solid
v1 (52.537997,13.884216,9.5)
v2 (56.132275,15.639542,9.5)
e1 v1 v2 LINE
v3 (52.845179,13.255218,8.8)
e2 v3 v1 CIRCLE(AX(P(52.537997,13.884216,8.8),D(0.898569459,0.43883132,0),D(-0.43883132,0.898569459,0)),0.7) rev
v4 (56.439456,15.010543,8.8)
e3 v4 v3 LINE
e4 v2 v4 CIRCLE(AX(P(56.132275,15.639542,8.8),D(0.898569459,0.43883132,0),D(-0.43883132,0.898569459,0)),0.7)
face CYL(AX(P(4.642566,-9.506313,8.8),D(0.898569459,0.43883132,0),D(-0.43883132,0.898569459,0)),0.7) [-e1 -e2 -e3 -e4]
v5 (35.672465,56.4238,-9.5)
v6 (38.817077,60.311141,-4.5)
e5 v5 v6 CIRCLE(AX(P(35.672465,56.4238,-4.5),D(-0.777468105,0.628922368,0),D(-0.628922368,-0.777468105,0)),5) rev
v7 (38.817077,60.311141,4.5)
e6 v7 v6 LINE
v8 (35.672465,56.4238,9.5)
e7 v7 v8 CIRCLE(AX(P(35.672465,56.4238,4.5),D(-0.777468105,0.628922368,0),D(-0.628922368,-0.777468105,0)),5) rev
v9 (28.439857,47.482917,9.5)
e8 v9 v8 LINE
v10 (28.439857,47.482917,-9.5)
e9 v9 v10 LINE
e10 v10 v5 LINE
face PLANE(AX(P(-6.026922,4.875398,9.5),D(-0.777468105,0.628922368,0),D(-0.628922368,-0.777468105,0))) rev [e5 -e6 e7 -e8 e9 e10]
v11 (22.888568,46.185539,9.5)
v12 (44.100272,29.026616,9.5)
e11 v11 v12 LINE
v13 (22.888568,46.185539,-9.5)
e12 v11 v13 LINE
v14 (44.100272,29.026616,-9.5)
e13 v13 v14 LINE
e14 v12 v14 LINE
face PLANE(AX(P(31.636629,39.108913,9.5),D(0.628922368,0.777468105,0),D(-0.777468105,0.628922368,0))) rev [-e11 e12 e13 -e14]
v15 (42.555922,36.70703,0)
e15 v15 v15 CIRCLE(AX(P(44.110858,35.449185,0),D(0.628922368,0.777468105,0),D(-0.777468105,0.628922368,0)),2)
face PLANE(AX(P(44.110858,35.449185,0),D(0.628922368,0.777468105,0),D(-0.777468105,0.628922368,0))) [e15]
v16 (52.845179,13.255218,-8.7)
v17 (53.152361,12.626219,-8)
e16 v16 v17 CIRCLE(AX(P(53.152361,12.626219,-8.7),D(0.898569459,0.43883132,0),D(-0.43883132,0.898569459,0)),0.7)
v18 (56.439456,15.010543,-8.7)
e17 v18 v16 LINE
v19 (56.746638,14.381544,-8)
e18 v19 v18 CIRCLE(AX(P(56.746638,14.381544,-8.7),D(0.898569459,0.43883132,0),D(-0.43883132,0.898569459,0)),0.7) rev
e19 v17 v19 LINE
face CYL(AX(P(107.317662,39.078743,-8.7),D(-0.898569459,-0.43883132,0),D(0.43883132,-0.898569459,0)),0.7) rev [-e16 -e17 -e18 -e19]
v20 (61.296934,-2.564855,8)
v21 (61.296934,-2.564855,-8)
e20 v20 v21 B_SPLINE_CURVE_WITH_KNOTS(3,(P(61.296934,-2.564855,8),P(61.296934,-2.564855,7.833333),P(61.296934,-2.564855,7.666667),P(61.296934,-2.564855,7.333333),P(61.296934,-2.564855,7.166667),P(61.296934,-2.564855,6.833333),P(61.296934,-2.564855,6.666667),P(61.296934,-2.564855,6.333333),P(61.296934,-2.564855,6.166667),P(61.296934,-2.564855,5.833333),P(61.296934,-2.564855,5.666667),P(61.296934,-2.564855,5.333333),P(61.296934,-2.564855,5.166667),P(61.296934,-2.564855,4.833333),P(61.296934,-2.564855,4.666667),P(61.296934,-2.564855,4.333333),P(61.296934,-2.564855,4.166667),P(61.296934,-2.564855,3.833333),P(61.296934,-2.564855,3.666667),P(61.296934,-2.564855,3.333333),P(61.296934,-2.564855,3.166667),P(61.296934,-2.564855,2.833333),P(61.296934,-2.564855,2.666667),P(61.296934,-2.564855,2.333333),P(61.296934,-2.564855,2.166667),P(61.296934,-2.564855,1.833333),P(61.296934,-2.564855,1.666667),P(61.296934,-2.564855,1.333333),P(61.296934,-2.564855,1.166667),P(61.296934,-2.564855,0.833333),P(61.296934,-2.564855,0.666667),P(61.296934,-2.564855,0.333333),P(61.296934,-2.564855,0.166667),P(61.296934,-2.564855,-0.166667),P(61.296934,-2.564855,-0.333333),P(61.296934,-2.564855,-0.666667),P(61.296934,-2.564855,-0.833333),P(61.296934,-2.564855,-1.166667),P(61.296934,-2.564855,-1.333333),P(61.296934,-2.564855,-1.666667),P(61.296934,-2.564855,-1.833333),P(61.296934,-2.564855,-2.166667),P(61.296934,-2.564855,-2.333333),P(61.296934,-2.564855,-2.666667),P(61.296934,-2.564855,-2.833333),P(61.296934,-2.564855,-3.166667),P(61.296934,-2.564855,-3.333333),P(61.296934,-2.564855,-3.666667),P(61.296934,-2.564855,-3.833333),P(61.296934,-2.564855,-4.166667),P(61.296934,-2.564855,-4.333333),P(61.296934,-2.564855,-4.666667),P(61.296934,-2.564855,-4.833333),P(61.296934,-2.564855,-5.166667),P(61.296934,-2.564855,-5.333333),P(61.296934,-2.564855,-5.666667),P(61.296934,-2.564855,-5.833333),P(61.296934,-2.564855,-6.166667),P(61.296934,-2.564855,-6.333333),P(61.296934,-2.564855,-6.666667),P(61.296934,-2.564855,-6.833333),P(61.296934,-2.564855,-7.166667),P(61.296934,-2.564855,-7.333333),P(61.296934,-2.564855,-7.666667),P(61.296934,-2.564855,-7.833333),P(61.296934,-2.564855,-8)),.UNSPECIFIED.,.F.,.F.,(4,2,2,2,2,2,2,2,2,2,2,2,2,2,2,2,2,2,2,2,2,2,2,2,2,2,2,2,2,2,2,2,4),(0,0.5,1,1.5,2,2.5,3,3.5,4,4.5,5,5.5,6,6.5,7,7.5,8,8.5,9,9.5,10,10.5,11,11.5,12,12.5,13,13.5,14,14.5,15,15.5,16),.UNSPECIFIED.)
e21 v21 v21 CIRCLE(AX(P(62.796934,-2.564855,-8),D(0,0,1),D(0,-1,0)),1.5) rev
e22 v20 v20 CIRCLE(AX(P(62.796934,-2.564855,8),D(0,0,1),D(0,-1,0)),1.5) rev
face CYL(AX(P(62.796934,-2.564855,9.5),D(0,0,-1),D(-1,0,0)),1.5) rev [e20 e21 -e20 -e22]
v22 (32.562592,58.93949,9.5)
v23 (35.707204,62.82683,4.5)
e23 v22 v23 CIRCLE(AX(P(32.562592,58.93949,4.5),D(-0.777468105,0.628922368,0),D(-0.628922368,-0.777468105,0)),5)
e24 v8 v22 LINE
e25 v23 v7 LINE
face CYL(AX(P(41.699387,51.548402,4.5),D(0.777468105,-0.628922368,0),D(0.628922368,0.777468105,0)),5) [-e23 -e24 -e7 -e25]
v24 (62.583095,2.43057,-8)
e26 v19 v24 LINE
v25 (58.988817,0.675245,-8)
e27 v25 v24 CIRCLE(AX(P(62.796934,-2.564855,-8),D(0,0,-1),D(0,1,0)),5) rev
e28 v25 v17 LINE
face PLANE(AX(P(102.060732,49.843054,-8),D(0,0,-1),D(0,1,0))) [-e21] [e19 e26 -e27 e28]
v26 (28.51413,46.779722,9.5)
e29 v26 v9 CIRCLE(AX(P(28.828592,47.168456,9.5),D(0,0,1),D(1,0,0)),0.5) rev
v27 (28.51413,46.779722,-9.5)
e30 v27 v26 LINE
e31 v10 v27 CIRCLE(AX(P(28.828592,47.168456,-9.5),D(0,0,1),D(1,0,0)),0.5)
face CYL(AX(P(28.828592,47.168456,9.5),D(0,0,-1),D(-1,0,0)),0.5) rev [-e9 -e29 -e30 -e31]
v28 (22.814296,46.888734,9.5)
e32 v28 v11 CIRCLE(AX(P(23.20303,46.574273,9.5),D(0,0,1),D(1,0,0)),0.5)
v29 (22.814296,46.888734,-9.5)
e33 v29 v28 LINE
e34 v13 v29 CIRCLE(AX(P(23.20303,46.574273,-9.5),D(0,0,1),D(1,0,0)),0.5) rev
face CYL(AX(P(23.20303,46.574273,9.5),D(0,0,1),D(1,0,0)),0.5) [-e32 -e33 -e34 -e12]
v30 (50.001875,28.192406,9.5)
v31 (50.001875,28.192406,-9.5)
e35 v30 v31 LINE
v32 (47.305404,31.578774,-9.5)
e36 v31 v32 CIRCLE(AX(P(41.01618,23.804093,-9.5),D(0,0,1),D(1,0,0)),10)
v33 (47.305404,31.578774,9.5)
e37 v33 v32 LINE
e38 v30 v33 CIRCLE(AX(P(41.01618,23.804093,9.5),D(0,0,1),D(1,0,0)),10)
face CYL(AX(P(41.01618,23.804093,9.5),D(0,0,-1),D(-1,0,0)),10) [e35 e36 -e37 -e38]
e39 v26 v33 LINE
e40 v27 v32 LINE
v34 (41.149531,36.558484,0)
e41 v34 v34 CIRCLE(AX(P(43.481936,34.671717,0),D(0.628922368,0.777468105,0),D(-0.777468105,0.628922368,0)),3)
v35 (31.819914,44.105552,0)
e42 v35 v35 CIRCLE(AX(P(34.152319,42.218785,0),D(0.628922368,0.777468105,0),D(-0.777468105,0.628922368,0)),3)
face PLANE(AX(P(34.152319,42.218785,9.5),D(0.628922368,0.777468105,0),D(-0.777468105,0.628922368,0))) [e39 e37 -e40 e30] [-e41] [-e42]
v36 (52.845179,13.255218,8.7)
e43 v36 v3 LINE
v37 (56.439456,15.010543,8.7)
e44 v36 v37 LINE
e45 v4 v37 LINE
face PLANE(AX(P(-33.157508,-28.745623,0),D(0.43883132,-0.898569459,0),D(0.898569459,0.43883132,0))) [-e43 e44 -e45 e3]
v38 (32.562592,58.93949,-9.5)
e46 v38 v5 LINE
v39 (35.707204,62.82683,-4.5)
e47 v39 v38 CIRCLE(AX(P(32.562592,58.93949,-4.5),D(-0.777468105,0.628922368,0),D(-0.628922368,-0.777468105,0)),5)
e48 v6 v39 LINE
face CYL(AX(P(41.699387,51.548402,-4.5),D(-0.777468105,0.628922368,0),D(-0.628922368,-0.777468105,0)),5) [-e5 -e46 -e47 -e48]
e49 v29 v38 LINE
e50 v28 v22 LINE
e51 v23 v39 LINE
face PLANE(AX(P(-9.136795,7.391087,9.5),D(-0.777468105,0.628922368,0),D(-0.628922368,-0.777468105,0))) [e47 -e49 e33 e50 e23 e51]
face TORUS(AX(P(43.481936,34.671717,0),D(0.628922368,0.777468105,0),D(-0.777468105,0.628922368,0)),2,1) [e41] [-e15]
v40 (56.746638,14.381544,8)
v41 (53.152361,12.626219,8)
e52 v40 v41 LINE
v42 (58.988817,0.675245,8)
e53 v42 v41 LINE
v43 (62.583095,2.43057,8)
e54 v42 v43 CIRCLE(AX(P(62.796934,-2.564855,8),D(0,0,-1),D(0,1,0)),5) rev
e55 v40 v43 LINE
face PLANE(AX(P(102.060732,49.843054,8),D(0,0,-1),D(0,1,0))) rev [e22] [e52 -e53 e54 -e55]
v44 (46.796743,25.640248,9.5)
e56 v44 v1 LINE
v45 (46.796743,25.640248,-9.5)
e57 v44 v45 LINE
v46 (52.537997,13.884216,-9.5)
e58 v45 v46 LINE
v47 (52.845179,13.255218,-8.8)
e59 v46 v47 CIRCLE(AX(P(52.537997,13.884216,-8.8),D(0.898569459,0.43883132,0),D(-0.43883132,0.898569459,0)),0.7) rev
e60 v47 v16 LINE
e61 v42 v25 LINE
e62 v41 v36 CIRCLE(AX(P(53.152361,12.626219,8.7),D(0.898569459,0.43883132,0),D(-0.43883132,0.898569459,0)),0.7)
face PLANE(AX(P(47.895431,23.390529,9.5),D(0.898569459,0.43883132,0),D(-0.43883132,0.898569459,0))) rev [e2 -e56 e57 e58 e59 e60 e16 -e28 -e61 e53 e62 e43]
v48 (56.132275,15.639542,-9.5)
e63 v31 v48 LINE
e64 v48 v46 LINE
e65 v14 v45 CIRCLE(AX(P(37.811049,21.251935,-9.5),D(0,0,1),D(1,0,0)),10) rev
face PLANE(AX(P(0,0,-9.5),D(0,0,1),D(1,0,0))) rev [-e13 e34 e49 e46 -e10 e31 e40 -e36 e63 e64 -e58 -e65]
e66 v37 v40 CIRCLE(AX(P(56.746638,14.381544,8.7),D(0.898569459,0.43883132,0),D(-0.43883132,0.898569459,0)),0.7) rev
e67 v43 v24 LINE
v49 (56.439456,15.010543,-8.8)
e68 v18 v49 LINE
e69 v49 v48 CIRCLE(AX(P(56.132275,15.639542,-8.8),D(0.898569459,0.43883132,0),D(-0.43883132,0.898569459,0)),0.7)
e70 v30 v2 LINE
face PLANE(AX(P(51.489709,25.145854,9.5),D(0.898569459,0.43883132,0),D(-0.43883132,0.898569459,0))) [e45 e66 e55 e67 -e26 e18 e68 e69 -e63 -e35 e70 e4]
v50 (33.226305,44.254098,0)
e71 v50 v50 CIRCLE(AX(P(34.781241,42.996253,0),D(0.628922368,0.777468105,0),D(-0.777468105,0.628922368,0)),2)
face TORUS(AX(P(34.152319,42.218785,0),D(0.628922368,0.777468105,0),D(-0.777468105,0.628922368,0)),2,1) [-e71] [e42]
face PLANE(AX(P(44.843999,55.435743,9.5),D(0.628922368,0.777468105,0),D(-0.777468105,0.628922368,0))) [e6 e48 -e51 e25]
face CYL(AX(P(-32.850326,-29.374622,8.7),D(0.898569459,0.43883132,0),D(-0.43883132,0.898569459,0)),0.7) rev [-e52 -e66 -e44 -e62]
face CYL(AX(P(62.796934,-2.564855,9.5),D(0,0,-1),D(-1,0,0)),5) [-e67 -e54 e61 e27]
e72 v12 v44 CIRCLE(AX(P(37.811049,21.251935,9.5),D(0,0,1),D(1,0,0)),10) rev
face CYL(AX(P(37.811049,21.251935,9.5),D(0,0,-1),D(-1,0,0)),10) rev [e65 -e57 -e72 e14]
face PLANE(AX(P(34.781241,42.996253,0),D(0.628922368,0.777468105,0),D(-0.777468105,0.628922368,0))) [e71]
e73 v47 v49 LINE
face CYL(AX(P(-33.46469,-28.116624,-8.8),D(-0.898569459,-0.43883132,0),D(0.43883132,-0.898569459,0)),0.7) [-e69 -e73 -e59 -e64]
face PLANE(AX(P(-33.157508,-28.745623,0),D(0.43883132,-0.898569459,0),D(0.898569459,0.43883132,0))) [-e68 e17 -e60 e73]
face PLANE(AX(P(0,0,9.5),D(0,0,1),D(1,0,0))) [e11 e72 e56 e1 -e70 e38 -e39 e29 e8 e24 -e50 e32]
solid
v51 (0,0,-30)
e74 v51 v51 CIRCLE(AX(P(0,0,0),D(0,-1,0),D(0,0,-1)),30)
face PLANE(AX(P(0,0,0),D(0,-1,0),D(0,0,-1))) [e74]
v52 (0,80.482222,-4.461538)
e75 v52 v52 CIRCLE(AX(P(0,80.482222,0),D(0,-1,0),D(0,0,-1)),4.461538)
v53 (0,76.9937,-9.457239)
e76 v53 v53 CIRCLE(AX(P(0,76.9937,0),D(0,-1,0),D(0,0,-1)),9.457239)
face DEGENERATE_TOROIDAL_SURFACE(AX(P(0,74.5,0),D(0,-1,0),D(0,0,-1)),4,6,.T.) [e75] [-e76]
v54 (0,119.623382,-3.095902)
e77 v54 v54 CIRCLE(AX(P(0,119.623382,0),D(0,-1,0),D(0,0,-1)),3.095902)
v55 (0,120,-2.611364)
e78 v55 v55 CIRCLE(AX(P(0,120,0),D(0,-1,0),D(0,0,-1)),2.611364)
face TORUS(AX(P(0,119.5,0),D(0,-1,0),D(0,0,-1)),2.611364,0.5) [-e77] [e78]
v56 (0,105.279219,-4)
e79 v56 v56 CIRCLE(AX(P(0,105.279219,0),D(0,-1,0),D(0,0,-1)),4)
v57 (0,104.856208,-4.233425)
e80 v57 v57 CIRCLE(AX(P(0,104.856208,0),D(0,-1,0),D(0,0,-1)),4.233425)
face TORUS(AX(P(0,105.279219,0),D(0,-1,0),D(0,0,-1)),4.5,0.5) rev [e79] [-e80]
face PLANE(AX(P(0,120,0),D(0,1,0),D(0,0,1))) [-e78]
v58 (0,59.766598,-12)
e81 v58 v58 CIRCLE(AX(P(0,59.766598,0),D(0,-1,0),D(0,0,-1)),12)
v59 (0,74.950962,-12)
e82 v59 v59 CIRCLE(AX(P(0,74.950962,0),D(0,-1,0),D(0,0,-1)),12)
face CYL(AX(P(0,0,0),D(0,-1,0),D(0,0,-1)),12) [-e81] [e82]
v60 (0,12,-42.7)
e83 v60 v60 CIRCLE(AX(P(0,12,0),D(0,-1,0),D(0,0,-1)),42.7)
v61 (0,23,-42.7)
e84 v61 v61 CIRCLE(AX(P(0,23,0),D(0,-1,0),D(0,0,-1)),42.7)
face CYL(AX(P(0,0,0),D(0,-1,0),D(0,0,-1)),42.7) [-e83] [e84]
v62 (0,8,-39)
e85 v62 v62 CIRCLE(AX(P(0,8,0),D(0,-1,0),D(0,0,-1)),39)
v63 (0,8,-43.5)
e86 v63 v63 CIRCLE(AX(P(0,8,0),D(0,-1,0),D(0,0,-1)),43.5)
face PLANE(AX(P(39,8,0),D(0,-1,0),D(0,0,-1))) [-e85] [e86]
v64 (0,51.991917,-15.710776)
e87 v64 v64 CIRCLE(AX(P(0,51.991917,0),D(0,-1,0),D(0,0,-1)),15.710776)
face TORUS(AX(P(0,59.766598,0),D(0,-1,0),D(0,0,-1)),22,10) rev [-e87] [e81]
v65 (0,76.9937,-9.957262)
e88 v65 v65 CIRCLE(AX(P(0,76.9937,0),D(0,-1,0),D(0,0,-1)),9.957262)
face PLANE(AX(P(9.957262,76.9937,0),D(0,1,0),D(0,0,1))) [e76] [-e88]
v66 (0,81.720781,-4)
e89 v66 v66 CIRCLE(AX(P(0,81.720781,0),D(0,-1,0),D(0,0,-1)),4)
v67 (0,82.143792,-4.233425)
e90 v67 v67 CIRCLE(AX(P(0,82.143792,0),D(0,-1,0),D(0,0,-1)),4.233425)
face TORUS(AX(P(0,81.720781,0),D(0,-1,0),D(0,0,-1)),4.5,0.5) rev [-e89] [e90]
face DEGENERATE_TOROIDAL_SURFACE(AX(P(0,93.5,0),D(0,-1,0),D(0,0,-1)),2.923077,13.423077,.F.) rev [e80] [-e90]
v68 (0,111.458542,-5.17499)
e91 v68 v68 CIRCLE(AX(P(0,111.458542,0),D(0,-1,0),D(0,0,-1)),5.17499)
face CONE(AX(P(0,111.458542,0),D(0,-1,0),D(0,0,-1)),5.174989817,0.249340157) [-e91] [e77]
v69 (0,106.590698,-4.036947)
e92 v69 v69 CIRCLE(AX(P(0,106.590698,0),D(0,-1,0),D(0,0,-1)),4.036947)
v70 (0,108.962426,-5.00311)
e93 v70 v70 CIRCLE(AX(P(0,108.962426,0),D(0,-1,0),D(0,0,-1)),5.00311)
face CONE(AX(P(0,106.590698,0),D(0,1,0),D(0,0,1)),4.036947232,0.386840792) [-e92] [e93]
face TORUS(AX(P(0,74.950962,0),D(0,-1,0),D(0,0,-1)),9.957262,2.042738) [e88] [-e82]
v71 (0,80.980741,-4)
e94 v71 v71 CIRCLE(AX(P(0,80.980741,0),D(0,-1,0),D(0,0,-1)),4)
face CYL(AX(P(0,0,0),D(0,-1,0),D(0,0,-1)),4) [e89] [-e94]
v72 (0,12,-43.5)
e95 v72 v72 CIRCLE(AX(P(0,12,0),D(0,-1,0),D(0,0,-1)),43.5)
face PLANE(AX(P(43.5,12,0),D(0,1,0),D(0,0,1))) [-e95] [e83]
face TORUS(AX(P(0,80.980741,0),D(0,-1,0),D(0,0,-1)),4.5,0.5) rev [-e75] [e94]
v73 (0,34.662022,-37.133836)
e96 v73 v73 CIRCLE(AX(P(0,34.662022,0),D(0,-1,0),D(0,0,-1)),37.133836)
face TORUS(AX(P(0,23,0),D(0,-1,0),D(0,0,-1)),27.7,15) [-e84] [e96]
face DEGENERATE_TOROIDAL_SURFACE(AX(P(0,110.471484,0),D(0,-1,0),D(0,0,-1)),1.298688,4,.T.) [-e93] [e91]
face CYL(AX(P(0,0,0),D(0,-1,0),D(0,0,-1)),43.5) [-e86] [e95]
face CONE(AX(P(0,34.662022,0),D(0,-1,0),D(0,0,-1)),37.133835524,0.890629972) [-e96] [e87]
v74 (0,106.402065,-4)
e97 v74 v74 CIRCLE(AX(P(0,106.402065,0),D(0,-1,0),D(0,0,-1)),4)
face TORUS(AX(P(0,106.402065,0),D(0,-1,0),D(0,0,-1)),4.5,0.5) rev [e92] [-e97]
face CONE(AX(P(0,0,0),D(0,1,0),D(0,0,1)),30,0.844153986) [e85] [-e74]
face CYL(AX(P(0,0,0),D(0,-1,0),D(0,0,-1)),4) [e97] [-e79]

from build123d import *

# Parameters (mm, degrees)
SKETCH2_R           = 5
SKETCH2_R_2         = 1.5
BOSS_EXTRUDE1_DEPTH = 9.5
FILLET1_R           = 5
FILLET2_R           = 0.5
SKETCH3_R           = 3
BOSS_EXTRUDE2_DEPTH = 1
FILLET3_R           = 1
CUT_EXTRUDE1_START  = -92.878989
SKETCH4_W           = 1.5
SKETCH4_H           = 14
SKETCH4_H_2         = 9.582575695
CUT_EXTRUDE1_DEPTH  = 96.923378
FILLET4_R           = 0.7


with BuildPart() as part:
    # Sketch1 → Revolve1 (revolve)
    with BuildSketch(Plane.XY, mode=Mode.PRIVATE) as revolve1_sk:
        with BuildLine():
            Line((0, 0), (30, 0))
            Line((30, 0), (39, 8))
            Line((39, 8), (43.5, 8))
            Line((43.5, 8), (43.5, 12))
            Line((43.5, 12), (42.7, 12))
            Line((42.7, 12), (42.7, 23))
            ThreePointArc((42.7, 23), (41.237125486, 29.46113253), (37.133835524, 34.662021579))
            Line((37.133835524, 34.662021579), (15.710776317, 51.991917226))
            ThreePointArc((15.710776317, 51.991917226), (12.975249676, 55.459176591), (12, 59.766598278))
            Line((12, 59.766598278), (12, 74.950961509))
            ThreePointArc((12, 74.950961509), (11.4016958, 76.395395624), (9.957261685, 76.993699825))
            Line((9.957261685, 76.993699825), (9.457239337, 76.993699825))
            ThreePointArc((9.457239337, 76.993699825), (7.435175355, 79.419305874), (4.461538462, 80.482222183))
            ThreePointArc((4.461538462, 80.482222183), (4.133100307, 80.641057588), (4, 80.980740698))
            Line((4, 80.980740698), (4, 81.720781011))
            ThreePointArc((4, 81.720781011), (4.062228774, 81.962351608), (4.233425414, 82.143791637))
            ThreePointArc((4.233425414, 82.143791637), (10.5, 93.5), (4.233425414, 104.856208363))
            ThreePointArc((4.233425414, 104.856208363), (4.062228774, 105.037648392), (4, 105.279218989))
            Line((4, 105.279218989), (4, 106.402065454))
            ThreePointArc((4, 106.402065454), (4.00932374, 106.498173768), (4.036947232, 106.590697725))
            Line((4.036947232, 106.590697725), (5.00311013, 108.962425541))
            ThreePointArc((5.00311013, 108.962425541), (5.289238494, 110.196699028), (5.174989817, 111.458542013))
            Line((5.174989817, 111.458542013), (3.095901624, 119.623382288))
            ThreePointArc((3.095901624, 119.623382288), (2.91820983, 119.894772811), (2.611363894, 120))
            Line((2.611363894, 120), (0, 120))
            Line((0, 120), (0, 0))
        make_face()
    revolve(revolve1_sk.sketch.rotate(Axis((0, 0, 0), (0, 1, 0)), 90), axis=Axis((0, 0, 0), (0, 1, 0)))


with BuildPart() as body_2:
    # Sketch2 → Boss-Extrude1 (new, symmetric)
    # profile 1 of 2: a face of its own
    with BuildSketch(Plane.XY):
        with BuildLine():
            Line((35.707204121, 62.82683021), (22.499834387, 46.5))
            Line((22.499834387, 46.5), (44.100272251, 29.026616274))
            ThreePointArc((44.100272251, 29.026616274), (45.633941503, 27.481088144), (46.796743158, 25.64024842))
            Line((46.796743158, 25.64024842), (58.988817141, 0.675245181))
            ThreePointArc((58.988817141, 0.675245181), (60.6027772, 1.927992552), (62.583094977, 2.43057046))
            Line((62.583094977, 2.43057046), (50.001874748, 28.192405912))
            ThreePointArc((50.001874748, 28.192405912), (48.839073093, 30.033245636), (47.305403841, 31.578773766))
            Line((47.305403841, 31.578773766), (28.125396281, 47.094182948))
            Line((28.125396281, 47.094182948), (38.817076542, 60.311140737))
            Line((38.817076542, 60.311140737), (35.707204121, 62.82683021))
        make_face()
    # profile 2 of 2: a face of its own
    with BuildSketch(Plane.XY):
        with Locations((62.796933799, -2.564854743)):
            Circle(SKETCH2_R)
        with Locations((62.796933799, -2.564854743)):
            Circle(SKETCH2_R_2, mode=Mode.SUBTRACT)
    extrude(amount=BOSS_EXTRUDE1_DEPTH, both=True)

    # Fillet1
    fillet1_edges = [body_2.edges().sort_by_distance(p)[0] for p in [
        (37.262140331, 61.568985473, -9.5),
        (37.262140331, 61.568985473, 9.5),
    ]]
    fillet(fillet1_edges, radius=FILLET1_R)

    # Fillet2
    fillet2_edges = [body_2.edges().sort_by_distance(p)[0] for p in [
        (22.499834387, 46.5, 0),
        (28.125396281, 47.094182948, 0),
    ]]
    fillet(fillet2_edges, radius=FILLET2_R)

    # Sketch3 → Boss-Extrude2 (add)
    with BuildSketch(Plane(origin=(34.15231855, 42.218785229, 0), x_dir=(0.7774681052383513, -0.6289223682912607, 0), z_dir=(0.6289223682912606, 0.7774681052383512, 0))):
        with Locations(Location((0, 0, 0), (0, 0, 180))):
            Circle(SKETCH3_R)
        with Locations(Location((12, 0, 0), (0, 0, 180))):
            Circle(SKETCH3_R)
    extrude(amount=BOSS_EXTRUDE2_DEPTH)

    # Fillet3
    fillet3_edges = [body_2.edges().sort_by_distance(p)[0] for p in [
        (37.113645234, 41.109486229, 0),
        (46.443262497, 33.56241781, 0),
    ]]
    fillet(fillet3_edges, radius=FILLET3_R - 0.0001)  # a hair under: the kernel refuses the full size

    # Sketch4 → Cut-Extrude1 (cut)
    with BuildSketch(Plane(origin=(51.489708745, 25.145854472, 0), x_dir=(0, 0, -1), z_dir=(0.8985694590185689, 0.4388313198930499, 0)).offset(CUT_EXTRUDE1_START)):
        with Locations((-8.75, -18.279385788)):
            Rectangle(SKETCH4_W, SKETCH4_H)
        with Locations((8.75, -30.070673636)):
            Rectangle(SKETCH4_W, SKETCH4_H_2)
        with Locations((8.75, -18.279385788)):
            Rectangle(SKETCH4_W, SKETCH4_H)
        with Locations((-8.75, -30.070673636)):
            Rectangle(SKETCH4_W, SKETCH4_H_2)
    extrude(amount=CUT_EXTRUDE1_DEPTH, mode=Mode.SUBTRACT)

    # Fillet4
    fillet4_edges = [body_2.edges().sort_by_distance(p)[0] for p in [
        (54.64231758, 14.132880247, -9.5),
        (54.64231758, 14.132880247, -8),
        (54.64231758, 14.132880247, 8),
        (54.64231758, 14.132880247, 9.5),
    ]]
    fillet(fillet4_edges, radius=FILLET4_R)


solid = Compound([part.part, body_2.part])
